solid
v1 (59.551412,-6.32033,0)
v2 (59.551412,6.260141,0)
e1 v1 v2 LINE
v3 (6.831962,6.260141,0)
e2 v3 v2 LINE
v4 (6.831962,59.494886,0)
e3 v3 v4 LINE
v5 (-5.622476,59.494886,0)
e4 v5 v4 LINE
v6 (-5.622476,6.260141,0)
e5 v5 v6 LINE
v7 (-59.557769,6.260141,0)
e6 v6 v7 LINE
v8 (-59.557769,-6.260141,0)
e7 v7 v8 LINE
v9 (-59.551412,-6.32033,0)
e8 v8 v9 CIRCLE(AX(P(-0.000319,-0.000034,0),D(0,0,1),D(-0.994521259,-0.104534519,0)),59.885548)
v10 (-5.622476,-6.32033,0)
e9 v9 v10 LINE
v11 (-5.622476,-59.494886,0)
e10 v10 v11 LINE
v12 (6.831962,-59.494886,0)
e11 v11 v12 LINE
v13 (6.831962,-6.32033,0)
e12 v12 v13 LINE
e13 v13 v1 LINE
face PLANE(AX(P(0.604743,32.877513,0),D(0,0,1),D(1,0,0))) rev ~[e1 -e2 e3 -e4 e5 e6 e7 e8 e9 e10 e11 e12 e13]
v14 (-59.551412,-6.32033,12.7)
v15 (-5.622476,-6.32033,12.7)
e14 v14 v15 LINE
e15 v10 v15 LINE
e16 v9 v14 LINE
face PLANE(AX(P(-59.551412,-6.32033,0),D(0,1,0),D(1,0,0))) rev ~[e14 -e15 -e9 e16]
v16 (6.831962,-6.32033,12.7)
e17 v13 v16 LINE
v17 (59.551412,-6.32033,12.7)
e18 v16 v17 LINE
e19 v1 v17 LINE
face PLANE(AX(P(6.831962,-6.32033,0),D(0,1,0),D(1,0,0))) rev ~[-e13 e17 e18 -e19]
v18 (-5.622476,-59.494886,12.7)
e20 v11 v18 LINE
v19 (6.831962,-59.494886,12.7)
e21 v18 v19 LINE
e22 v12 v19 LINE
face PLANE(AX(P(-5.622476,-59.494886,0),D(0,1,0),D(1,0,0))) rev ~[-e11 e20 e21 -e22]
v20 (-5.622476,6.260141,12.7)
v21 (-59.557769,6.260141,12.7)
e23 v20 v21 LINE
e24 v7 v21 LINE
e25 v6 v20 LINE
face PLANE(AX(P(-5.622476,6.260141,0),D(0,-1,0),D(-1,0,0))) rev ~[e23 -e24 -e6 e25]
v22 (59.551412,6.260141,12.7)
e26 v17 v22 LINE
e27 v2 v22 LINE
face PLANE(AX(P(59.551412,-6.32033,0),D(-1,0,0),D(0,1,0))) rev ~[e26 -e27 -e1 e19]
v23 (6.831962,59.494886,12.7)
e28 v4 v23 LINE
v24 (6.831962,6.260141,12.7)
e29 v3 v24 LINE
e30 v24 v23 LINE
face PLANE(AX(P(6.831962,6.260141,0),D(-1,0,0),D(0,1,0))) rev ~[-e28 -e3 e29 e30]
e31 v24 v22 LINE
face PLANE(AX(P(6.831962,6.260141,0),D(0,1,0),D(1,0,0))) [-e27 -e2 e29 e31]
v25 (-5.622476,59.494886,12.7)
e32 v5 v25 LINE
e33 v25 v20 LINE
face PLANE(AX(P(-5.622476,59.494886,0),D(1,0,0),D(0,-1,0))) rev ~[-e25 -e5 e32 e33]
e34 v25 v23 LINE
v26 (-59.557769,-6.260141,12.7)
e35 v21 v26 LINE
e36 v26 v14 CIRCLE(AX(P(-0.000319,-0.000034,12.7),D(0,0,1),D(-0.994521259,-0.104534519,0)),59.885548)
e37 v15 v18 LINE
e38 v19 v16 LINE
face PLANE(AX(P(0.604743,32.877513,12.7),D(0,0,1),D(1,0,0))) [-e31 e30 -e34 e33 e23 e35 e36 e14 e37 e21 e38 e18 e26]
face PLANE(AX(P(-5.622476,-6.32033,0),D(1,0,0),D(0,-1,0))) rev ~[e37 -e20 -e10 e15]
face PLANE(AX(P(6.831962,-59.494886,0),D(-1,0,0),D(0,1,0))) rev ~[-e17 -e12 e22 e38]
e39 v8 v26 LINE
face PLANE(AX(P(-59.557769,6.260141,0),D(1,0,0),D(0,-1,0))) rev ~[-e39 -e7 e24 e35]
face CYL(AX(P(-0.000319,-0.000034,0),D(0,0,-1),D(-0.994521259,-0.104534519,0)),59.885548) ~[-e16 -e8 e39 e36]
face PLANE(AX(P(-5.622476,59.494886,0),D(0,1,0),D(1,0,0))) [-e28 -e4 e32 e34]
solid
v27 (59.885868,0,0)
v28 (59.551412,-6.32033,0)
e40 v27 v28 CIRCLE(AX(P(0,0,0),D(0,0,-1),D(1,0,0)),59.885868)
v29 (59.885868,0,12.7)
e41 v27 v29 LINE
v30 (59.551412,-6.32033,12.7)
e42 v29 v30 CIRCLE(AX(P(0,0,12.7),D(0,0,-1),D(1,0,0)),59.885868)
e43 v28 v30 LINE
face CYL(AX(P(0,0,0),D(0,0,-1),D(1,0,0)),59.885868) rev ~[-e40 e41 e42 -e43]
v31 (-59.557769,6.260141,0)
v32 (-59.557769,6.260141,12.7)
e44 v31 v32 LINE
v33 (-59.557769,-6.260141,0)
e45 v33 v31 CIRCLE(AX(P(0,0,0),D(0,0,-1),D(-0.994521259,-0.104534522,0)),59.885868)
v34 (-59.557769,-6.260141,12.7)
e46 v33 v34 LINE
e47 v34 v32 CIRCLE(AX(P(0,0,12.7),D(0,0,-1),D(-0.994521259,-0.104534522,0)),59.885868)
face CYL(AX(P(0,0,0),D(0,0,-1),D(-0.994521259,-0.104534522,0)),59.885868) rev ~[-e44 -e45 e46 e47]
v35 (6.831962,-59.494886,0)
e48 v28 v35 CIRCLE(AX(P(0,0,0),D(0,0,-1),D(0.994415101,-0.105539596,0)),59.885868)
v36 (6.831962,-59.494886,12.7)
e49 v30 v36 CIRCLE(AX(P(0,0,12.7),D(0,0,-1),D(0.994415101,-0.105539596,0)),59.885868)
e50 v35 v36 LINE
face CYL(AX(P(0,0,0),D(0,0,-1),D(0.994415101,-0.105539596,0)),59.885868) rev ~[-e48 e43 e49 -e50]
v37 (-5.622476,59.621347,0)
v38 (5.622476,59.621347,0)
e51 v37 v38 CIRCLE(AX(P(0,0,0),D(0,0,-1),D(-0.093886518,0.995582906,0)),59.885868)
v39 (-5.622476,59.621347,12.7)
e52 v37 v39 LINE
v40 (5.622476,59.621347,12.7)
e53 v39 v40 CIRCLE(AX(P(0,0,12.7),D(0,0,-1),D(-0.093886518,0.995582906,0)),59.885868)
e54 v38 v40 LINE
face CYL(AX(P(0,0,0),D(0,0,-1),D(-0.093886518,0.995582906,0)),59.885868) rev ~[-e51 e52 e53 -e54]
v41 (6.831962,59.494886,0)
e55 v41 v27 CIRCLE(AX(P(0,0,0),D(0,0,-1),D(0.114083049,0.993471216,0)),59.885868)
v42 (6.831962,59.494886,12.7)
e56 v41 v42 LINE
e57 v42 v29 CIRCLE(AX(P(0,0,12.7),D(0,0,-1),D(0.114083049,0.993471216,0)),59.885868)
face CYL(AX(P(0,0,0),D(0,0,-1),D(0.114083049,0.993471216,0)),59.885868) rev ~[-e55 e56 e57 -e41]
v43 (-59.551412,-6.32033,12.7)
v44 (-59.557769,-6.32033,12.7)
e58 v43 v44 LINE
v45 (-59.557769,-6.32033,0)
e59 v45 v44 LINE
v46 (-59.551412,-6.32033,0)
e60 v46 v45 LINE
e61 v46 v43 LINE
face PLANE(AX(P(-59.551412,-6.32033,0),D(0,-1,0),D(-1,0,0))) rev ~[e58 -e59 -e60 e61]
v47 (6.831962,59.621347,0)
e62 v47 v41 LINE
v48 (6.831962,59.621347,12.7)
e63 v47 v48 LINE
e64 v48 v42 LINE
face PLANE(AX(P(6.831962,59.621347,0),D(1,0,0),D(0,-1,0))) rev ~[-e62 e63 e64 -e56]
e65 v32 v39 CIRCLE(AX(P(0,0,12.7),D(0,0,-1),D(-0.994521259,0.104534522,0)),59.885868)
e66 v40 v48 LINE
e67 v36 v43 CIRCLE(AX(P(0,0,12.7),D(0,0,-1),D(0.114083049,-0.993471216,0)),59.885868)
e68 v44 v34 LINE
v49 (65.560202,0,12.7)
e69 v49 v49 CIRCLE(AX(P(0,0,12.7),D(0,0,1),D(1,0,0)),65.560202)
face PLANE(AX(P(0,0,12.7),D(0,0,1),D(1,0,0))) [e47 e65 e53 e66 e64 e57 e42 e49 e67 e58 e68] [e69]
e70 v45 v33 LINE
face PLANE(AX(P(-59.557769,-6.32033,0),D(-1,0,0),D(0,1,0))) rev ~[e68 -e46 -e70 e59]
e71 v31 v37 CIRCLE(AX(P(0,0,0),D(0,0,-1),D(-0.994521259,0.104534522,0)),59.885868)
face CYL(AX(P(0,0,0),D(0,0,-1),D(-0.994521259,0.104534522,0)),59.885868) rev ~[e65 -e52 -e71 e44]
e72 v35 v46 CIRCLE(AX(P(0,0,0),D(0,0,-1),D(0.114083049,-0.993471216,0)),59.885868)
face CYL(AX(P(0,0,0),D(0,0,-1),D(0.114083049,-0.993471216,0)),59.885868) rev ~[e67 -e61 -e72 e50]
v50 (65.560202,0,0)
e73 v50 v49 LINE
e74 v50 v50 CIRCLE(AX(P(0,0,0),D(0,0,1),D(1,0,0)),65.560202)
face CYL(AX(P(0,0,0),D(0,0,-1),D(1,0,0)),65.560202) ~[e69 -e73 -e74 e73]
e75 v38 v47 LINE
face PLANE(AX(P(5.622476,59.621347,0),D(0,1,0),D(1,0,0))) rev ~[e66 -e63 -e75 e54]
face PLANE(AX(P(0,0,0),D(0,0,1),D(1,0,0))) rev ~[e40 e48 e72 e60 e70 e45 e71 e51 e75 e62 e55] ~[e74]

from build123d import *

# Parameters (mm, degrees)
F0_R     = 65.5602022546
F1_DEPTH = 12.7
F0_W     = 12.4544380459
F0_H     = 53.2347456641
F0_W_2   = 52.7194491877
F0_H_2   = 12.5804708937
F0_H_3   = 53.1745559146


with BuildPart() as f1:
    # F0 (on Top) → F1 (new body)
    with BuildSketch(Plane.XY):
        Circle(F0_R)
        with BuildLine():
            ThreePointArc((6.8319624097, 59.4948862362), (44.6959461159, 39.8571147906), (59.8858681045, 0))
            ThreePointArc((59.8858681045, 0), (59.802195524, -3.1645867238), (59.5514115975, -6.3203303216))
            ThreePointArc((59.5514115975, -6.3203303216), (42.5273022343, -42.1633224889), (6.8319624097, -59.4948862362))
            ThreePointArc((6.8319624097, -59.4948862362), (-37.4395303101, -46.7396915777), (-59.5514115975, -6.3203303216))
            Line((-59.5514115975, -6.3203303216), (-59.5577689193, -6.3203303216))
            Line((-59.5577689193, -6.3203303216), (-59.5577689193, -6.2601405721))
            ThreePointArc((-59.5577689193, -6.2601405721), (-59.8858681045, 0), (-59.5577689193, 6.2601405721))
            ThreePointArc((-59.5577689193, 6.2601405721), (-42.1185309141, 42.5716637244), (-5.6224756362, 59.621346566))
            ThreePointArc((-5.6224756362, 59.621346566), (0, 59.8858681045), (5.6224756362, 59.621346566))
            Line((5.6224756362, 59.621346566), (6.8319624097, 59.621346566))
            Line((6.8319624097, 59.621346566), (6.8319624097, 59.4948862362))
        make_face(mode=Mode.SUBTRACT)
    extrude(amount=F1_DEPTH)


with BuildPart() as f1b:
    # F0 (on Top) → F1, piece 2 (new body)
    with BuildSketch(Plane.XY):
        with Locations((0.6047433868, 32.8775134042)):
            Rectangle(F0_W, F0_H)
        with Locations((33.1916870036, -0.0300948747)):
            Rectangle(F0_W_2, F0_H_2)
        with Locations((0.6047433868, -0.0300948747)):
            Rectangle(F0_W, F0_H_2)
        with Locations((0.6047433868, -32.9076082789)):
            Rectangle(F0_W, F0_H_3)
        with BuildLine():
            Line((-5.6224756362, -6.3203303216), (-5.6224756362, 6.2601405721))
            Line((-5.6224756362, 6.2601405721), (-59.5577689193, 6.2601405721))
            Line((-59.5577689193, 6.2601405721), (-59.5577689193, -6.2601405721))
            ThreePointArc((-59.5577689193, -6.2601405721), (-59.5545978624, -6.29023625), (-59.5514115975, -6.3203303216))
            Line((-59.5514115975, -6.3203303216), (-5.6224756362, -6.3203303216))
        make_face()
    extrude(amount=F1_DEPTH)


solid = Compound([f1.part, f1b.part])
